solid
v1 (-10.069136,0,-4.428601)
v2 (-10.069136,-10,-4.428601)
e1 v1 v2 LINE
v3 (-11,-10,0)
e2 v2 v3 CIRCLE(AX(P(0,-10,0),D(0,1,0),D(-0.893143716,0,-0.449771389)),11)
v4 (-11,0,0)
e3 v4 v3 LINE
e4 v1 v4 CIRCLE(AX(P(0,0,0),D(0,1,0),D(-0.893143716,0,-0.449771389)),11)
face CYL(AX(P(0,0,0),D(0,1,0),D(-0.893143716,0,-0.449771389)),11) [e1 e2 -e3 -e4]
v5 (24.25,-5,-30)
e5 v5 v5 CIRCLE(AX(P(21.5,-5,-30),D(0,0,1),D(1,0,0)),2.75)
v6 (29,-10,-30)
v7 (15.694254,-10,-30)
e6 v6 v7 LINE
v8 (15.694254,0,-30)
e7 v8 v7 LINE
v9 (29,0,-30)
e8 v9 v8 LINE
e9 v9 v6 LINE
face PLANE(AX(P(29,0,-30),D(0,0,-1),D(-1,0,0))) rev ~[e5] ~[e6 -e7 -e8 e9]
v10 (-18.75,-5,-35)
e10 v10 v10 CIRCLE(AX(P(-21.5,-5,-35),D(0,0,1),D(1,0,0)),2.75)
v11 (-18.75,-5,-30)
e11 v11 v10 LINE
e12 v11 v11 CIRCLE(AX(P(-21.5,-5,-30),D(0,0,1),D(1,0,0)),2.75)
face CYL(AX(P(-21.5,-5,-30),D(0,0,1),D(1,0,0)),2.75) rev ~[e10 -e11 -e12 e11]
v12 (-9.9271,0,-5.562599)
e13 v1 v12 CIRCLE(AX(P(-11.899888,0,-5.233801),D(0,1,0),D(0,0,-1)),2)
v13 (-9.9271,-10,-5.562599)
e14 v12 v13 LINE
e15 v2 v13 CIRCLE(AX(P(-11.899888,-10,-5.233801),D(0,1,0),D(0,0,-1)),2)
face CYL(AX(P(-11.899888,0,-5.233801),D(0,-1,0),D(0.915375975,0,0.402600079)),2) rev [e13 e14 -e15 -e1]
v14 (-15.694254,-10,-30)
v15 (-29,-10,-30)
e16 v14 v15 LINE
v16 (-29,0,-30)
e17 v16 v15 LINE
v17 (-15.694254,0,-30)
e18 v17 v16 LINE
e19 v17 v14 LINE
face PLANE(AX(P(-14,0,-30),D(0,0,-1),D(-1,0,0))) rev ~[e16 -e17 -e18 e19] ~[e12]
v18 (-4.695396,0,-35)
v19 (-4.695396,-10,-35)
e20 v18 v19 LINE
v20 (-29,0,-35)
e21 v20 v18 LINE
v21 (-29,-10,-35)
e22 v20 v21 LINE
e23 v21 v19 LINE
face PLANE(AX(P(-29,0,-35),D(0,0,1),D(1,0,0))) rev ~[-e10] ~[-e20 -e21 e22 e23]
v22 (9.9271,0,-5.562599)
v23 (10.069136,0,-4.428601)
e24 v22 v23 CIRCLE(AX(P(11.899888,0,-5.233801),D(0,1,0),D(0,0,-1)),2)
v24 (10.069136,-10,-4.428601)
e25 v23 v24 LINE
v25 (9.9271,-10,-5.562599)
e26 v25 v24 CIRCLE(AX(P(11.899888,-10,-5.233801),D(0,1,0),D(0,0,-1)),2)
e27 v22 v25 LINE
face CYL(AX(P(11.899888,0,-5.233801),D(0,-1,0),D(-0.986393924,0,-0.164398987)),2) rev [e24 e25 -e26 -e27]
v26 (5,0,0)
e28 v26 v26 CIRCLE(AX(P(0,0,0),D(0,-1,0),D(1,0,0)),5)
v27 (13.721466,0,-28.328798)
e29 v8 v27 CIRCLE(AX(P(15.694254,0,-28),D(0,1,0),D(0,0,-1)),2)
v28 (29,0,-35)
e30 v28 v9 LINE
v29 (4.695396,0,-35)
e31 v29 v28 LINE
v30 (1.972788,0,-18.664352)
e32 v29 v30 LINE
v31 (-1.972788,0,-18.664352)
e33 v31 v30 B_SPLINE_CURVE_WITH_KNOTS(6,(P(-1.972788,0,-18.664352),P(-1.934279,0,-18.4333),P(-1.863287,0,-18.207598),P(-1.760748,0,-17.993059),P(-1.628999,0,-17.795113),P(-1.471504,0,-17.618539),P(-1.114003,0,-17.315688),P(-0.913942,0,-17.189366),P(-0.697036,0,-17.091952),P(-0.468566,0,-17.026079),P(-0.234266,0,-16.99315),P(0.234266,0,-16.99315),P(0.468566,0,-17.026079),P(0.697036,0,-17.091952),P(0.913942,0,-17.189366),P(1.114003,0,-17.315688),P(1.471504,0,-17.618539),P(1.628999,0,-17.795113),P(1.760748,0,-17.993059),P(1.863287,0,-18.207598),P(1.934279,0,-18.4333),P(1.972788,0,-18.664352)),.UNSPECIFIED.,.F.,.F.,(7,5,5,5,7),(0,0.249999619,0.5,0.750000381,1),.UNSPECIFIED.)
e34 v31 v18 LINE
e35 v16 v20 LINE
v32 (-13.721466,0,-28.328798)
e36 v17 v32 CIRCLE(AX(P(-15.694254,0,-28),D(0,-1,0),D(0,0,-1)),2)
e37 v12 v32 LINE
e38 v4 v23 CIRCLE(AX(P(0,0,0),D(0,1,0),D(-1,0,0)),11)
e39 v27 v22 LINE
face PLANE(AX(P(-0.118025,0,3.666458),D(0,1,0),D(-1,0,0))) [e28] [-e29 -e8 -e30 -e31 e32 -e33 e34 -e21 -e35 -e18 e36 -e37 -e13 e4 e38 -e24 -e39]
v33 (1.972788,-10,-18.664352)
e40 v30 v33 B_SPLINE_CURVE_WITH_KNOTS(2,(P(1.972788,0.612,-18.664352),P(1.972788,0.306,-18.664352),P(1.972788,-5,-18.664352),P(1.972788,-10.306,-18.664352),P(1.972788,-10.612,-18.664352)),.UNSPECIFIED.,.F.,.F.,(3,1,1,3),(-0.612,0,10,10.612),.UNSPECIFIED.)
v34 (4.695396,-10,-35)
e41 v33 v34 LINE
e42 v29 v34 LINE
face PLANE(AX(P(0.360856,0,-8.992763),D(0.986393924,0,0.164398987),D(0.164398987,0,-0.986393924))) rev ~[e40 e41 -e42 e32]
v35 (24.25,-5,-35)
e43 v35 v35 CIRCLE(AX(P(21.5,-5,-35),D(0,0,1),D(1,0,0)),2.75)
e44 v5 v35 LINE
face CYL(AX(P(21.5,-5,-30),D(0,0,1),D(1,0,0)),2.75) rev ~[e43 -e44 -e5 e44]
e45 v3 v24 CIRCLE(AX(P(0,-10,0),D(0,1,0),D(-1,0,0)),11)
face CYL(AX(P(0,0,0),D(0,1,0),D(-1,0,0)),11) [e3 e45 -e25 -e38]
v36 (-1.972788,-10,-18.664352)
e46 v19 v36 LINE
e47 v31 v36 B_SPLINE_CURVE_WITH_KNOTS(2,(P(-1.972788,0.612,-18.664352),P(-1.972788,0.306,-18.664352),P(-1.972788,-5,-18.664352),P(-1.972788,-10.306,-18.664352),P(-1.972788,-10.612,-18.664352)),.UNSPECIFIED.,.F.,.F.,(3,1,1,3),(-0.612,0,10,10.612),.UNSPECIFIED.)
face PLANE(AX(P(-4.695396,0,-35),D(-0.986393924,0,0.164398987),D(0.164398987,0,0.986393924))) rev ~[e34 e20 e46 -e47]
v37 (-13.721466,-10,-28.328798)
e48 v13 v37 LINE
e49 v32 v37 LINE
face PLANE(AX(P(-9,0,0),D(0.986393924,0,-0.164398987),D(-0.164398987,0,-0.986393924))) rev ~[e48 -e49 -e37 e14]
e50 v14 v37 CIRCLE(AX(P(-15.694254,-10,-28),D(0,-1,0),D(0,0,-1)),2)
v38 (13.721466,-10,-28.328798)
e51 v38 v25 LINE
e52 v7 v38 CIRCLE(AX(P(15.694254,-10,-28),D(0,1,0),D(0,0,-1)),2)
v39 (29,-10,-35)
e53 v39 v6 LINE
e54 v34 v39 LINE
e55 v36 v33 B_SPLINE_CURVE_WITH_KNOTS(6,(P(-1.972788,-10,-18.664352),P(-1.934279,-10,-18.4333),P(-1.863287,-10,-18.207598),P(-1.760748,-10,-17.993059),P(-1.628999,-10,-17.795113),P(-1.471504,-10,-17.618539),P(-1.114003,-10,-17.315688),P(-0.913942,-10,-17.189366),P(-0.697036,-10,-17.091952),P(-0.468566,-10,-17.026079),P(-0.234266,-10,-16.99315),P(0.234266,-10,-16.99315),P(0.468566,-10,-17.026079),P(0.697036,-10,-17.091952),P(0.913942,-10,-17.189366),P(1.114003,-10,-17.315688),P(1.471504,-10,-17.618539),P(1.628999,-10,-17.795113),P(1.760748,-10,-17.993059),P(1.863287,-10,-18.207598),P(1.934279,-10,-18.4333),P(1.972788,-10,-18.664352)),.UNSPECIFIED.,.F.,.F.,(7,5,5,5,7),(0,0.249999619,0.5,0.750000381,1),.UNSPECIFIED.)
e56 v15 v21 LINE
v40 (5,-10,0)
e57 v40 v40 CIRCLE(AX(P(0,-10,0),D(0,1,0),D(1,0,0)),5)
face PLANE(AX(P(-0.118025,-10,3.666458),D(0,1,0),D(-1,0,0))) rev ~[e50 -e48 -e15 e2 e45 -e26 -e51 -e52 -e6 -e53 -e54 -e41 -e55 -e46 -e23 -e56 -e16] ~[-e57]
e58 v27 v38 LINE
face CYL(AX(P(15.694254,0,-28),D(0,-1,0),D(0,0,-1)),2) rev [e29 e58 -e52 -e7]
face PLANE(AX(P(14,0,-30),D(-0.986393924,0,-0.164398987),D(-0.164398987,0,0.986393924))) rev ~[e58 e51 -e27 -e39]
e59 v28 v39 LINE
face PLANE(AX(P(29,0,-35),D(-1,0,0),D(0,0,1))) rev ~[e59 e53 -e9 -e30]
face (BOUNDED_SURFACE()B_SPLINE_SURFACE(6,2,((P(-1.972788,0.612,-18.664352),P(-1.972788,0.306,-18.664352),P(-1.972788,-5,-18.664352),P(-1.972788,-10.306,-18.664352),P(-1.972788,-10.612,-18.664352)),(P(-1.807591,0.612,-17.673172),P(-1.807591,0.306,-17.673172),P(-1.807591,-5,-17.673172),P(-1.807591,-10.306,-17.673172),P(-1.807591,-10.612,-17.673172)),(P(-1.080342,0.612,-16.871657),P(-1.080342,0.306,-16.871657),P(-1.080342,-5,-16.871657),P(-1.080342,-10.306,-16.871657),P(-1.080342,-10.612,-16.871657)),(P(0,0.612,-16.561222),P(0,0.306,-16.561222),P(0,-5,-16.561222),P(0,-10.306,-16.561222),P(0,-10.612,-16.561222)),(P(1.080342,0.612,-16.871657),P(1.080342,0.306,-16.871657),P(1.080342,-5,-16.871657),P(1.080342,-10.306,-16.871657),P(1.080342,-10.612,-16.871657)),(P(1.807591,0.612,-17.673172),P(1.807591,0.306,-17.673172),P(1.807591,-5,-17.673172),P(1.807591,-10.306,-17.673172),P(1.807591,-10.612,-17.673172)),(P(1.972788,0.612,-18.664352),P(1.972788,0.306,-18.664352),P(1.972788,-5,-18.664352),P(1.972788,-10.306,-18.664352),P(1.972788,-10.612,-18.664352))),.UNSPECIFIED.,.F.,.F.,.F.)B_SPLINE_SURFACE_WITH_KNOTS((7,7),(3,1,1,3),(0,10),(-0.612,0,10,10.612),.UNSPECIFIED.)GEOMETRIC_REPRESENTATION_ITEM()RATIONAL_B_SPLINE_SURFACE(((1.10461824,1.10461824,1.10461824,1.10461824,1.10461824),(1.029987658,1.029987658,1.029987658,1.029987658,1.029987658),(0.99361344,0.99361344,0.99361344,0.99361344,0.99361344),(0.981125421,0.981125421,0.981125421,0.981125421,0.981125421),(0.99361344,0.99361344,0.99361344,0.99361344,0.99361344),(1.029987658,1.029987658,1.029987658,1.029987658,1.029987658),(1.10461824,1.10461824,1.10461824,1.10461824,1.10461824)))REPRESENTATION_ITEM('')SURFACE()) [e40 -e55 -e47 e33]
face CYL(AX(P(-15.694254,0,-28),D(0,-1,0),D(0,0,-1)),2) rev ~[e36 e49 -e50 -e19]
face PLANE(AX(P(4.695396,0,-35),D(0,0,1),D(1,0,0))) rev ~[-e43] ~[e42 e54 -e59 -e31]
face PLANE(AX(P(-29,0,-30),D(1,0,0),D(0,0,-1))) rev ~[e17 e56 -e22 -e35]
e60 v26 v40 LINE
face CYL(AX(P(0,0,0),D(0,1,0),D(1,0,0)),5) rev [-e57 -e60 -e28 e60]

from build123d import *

# Parameters (mm, degrees)
F0_R     = 5
F1_DEPTH = 10
F2_R     = 2.75
F3_DEPTH = 5.001
F4_R     = 5
F5_DEPTH = 10
F6_R     = 2


with BuildPart() as f1:
    # F0 (on Front) → F1 (new body)
    with BuildSketch(Plane.XZ):
        with BuildLine():
            ThreePointArc((-0.3608562494, -8.9927627995), (-6.4902891401, -6.2350739272), (-9, 0))
            Line((-9, 0), (-14, -30))
            Line((-14, -30), (-29, -30))
            Line((-29, -30), (-29, -35))
            Line((-29, -35), (-4.6953957828, -35))
            Line((-4.6953957828, -35), (-0.3608562494, -8.9927627995))
        make_face()
        with BuildLine():
            ThreePointArc((0.3608562494, -8.9927627995), (6.4902891401, -6.2350739272), (9, 0))
            ThreePointArc((9, 0), (0, 9), (-9, 0))
            ThreePointArc((-9, 0), (-6.4902891401, -6.2350739272), (-0.3608562494, -8.9927627995))
            Line((-0.3608562494, -8.9927627995), (0, -6.827625303))
            Line((0, -6.827625303), (0.3608562494, -8.9927627995))
        make_face()
        Circle(F0_R, mode=Mode.SUBTRACT)
        with BuildLine():
            Line((14, -30), (9, 0))
            ThreePointArc((9, 0), (6.4902891401, -6.2350739272), (0.3608562494, -8.9927627995))
            Line((0.3608562494, -8.9927627995), (4.6953957828, -35))
            Line((4.6953957828, -35), (29, -35))
            Line((29, -35), (29, -30))
            Line((29, -30), (14, -30))
        make_face()
    extrude(amount=F1_DEPTH)

    # F2 (on face) → F3 (cut, through all)
    with BuildSketch(Plane.XY.offset(-30)):
        with Locations((-21.5, -5)):
            Circle(F2_R)
        with Locations((21.5, -5)):
            Circle(F2_R)
    extrude(amount=-F3_DEPTH, mode=Mode.SUBTRACT)

    # F4 (on face) → F5 (join, through all)
    with BuildSketch(Plane(origin=(0, 0, 0), x_dir=(-1, 0, 0), z_dir=(0, 1, 0))):
        with BuildLine():
            ThreePointArc((9.8245808792, -4.9474852752), (10.7021116998, -2.542598113), (11, 0))
            ThreePointArc((11, 0), (-2.542598113, 10.7021116998), (-9.8245808792, -4.9474852752))
            Line((-9.8245808792, -4.9474852752), (-9, 0))
            ThreePointArc((-9, 0), (0, 9), (9, 0))
            Line((9, 0), (9.8245808792, -4.9474852752))
        make_face()
        with BuildLine():
            Line((-9, 0), (-9.8245808792, -4.9474852752))
            ThreePointArc((-9.8245808792, -4.9474852752), (-6.0614233206, -9.1792781485), (-0.6917668776, -10.9782265684))
            Line((-0.6917668776, -10.9782265684), (0, -6.827625303))
            Line((0, -6.827625303), (0.6917668776, -10.9782265684))
            ThreePointArc((0.6917668776, -10.9782265684), (6.0614233206, -9.1792781485), (9.8245808792, -4.9474852752))
            Line((9.8245808792, -4.9474852752), (9, 0))
            ThreePointArc((9, 0), (0, 9), (-9, 0))
        make_face()
        Circle(F4_R, mode=Mode.SUBTRACT)
    extrude(amount=-F5_DEPTH)

    # F6
    f6_edges = [f1.edges().sort_by_distance(p)[0] for p in [
        (0, -5, -6.827625),
        (-14, -5, -30),
        (14, -5, -30),
        (-9.824581, -5, -4.947485),
        (9.824581, -5, -4.947485),
    ]]
    fillet(f6_edges, radius=F6_R)


solid = f1.part
